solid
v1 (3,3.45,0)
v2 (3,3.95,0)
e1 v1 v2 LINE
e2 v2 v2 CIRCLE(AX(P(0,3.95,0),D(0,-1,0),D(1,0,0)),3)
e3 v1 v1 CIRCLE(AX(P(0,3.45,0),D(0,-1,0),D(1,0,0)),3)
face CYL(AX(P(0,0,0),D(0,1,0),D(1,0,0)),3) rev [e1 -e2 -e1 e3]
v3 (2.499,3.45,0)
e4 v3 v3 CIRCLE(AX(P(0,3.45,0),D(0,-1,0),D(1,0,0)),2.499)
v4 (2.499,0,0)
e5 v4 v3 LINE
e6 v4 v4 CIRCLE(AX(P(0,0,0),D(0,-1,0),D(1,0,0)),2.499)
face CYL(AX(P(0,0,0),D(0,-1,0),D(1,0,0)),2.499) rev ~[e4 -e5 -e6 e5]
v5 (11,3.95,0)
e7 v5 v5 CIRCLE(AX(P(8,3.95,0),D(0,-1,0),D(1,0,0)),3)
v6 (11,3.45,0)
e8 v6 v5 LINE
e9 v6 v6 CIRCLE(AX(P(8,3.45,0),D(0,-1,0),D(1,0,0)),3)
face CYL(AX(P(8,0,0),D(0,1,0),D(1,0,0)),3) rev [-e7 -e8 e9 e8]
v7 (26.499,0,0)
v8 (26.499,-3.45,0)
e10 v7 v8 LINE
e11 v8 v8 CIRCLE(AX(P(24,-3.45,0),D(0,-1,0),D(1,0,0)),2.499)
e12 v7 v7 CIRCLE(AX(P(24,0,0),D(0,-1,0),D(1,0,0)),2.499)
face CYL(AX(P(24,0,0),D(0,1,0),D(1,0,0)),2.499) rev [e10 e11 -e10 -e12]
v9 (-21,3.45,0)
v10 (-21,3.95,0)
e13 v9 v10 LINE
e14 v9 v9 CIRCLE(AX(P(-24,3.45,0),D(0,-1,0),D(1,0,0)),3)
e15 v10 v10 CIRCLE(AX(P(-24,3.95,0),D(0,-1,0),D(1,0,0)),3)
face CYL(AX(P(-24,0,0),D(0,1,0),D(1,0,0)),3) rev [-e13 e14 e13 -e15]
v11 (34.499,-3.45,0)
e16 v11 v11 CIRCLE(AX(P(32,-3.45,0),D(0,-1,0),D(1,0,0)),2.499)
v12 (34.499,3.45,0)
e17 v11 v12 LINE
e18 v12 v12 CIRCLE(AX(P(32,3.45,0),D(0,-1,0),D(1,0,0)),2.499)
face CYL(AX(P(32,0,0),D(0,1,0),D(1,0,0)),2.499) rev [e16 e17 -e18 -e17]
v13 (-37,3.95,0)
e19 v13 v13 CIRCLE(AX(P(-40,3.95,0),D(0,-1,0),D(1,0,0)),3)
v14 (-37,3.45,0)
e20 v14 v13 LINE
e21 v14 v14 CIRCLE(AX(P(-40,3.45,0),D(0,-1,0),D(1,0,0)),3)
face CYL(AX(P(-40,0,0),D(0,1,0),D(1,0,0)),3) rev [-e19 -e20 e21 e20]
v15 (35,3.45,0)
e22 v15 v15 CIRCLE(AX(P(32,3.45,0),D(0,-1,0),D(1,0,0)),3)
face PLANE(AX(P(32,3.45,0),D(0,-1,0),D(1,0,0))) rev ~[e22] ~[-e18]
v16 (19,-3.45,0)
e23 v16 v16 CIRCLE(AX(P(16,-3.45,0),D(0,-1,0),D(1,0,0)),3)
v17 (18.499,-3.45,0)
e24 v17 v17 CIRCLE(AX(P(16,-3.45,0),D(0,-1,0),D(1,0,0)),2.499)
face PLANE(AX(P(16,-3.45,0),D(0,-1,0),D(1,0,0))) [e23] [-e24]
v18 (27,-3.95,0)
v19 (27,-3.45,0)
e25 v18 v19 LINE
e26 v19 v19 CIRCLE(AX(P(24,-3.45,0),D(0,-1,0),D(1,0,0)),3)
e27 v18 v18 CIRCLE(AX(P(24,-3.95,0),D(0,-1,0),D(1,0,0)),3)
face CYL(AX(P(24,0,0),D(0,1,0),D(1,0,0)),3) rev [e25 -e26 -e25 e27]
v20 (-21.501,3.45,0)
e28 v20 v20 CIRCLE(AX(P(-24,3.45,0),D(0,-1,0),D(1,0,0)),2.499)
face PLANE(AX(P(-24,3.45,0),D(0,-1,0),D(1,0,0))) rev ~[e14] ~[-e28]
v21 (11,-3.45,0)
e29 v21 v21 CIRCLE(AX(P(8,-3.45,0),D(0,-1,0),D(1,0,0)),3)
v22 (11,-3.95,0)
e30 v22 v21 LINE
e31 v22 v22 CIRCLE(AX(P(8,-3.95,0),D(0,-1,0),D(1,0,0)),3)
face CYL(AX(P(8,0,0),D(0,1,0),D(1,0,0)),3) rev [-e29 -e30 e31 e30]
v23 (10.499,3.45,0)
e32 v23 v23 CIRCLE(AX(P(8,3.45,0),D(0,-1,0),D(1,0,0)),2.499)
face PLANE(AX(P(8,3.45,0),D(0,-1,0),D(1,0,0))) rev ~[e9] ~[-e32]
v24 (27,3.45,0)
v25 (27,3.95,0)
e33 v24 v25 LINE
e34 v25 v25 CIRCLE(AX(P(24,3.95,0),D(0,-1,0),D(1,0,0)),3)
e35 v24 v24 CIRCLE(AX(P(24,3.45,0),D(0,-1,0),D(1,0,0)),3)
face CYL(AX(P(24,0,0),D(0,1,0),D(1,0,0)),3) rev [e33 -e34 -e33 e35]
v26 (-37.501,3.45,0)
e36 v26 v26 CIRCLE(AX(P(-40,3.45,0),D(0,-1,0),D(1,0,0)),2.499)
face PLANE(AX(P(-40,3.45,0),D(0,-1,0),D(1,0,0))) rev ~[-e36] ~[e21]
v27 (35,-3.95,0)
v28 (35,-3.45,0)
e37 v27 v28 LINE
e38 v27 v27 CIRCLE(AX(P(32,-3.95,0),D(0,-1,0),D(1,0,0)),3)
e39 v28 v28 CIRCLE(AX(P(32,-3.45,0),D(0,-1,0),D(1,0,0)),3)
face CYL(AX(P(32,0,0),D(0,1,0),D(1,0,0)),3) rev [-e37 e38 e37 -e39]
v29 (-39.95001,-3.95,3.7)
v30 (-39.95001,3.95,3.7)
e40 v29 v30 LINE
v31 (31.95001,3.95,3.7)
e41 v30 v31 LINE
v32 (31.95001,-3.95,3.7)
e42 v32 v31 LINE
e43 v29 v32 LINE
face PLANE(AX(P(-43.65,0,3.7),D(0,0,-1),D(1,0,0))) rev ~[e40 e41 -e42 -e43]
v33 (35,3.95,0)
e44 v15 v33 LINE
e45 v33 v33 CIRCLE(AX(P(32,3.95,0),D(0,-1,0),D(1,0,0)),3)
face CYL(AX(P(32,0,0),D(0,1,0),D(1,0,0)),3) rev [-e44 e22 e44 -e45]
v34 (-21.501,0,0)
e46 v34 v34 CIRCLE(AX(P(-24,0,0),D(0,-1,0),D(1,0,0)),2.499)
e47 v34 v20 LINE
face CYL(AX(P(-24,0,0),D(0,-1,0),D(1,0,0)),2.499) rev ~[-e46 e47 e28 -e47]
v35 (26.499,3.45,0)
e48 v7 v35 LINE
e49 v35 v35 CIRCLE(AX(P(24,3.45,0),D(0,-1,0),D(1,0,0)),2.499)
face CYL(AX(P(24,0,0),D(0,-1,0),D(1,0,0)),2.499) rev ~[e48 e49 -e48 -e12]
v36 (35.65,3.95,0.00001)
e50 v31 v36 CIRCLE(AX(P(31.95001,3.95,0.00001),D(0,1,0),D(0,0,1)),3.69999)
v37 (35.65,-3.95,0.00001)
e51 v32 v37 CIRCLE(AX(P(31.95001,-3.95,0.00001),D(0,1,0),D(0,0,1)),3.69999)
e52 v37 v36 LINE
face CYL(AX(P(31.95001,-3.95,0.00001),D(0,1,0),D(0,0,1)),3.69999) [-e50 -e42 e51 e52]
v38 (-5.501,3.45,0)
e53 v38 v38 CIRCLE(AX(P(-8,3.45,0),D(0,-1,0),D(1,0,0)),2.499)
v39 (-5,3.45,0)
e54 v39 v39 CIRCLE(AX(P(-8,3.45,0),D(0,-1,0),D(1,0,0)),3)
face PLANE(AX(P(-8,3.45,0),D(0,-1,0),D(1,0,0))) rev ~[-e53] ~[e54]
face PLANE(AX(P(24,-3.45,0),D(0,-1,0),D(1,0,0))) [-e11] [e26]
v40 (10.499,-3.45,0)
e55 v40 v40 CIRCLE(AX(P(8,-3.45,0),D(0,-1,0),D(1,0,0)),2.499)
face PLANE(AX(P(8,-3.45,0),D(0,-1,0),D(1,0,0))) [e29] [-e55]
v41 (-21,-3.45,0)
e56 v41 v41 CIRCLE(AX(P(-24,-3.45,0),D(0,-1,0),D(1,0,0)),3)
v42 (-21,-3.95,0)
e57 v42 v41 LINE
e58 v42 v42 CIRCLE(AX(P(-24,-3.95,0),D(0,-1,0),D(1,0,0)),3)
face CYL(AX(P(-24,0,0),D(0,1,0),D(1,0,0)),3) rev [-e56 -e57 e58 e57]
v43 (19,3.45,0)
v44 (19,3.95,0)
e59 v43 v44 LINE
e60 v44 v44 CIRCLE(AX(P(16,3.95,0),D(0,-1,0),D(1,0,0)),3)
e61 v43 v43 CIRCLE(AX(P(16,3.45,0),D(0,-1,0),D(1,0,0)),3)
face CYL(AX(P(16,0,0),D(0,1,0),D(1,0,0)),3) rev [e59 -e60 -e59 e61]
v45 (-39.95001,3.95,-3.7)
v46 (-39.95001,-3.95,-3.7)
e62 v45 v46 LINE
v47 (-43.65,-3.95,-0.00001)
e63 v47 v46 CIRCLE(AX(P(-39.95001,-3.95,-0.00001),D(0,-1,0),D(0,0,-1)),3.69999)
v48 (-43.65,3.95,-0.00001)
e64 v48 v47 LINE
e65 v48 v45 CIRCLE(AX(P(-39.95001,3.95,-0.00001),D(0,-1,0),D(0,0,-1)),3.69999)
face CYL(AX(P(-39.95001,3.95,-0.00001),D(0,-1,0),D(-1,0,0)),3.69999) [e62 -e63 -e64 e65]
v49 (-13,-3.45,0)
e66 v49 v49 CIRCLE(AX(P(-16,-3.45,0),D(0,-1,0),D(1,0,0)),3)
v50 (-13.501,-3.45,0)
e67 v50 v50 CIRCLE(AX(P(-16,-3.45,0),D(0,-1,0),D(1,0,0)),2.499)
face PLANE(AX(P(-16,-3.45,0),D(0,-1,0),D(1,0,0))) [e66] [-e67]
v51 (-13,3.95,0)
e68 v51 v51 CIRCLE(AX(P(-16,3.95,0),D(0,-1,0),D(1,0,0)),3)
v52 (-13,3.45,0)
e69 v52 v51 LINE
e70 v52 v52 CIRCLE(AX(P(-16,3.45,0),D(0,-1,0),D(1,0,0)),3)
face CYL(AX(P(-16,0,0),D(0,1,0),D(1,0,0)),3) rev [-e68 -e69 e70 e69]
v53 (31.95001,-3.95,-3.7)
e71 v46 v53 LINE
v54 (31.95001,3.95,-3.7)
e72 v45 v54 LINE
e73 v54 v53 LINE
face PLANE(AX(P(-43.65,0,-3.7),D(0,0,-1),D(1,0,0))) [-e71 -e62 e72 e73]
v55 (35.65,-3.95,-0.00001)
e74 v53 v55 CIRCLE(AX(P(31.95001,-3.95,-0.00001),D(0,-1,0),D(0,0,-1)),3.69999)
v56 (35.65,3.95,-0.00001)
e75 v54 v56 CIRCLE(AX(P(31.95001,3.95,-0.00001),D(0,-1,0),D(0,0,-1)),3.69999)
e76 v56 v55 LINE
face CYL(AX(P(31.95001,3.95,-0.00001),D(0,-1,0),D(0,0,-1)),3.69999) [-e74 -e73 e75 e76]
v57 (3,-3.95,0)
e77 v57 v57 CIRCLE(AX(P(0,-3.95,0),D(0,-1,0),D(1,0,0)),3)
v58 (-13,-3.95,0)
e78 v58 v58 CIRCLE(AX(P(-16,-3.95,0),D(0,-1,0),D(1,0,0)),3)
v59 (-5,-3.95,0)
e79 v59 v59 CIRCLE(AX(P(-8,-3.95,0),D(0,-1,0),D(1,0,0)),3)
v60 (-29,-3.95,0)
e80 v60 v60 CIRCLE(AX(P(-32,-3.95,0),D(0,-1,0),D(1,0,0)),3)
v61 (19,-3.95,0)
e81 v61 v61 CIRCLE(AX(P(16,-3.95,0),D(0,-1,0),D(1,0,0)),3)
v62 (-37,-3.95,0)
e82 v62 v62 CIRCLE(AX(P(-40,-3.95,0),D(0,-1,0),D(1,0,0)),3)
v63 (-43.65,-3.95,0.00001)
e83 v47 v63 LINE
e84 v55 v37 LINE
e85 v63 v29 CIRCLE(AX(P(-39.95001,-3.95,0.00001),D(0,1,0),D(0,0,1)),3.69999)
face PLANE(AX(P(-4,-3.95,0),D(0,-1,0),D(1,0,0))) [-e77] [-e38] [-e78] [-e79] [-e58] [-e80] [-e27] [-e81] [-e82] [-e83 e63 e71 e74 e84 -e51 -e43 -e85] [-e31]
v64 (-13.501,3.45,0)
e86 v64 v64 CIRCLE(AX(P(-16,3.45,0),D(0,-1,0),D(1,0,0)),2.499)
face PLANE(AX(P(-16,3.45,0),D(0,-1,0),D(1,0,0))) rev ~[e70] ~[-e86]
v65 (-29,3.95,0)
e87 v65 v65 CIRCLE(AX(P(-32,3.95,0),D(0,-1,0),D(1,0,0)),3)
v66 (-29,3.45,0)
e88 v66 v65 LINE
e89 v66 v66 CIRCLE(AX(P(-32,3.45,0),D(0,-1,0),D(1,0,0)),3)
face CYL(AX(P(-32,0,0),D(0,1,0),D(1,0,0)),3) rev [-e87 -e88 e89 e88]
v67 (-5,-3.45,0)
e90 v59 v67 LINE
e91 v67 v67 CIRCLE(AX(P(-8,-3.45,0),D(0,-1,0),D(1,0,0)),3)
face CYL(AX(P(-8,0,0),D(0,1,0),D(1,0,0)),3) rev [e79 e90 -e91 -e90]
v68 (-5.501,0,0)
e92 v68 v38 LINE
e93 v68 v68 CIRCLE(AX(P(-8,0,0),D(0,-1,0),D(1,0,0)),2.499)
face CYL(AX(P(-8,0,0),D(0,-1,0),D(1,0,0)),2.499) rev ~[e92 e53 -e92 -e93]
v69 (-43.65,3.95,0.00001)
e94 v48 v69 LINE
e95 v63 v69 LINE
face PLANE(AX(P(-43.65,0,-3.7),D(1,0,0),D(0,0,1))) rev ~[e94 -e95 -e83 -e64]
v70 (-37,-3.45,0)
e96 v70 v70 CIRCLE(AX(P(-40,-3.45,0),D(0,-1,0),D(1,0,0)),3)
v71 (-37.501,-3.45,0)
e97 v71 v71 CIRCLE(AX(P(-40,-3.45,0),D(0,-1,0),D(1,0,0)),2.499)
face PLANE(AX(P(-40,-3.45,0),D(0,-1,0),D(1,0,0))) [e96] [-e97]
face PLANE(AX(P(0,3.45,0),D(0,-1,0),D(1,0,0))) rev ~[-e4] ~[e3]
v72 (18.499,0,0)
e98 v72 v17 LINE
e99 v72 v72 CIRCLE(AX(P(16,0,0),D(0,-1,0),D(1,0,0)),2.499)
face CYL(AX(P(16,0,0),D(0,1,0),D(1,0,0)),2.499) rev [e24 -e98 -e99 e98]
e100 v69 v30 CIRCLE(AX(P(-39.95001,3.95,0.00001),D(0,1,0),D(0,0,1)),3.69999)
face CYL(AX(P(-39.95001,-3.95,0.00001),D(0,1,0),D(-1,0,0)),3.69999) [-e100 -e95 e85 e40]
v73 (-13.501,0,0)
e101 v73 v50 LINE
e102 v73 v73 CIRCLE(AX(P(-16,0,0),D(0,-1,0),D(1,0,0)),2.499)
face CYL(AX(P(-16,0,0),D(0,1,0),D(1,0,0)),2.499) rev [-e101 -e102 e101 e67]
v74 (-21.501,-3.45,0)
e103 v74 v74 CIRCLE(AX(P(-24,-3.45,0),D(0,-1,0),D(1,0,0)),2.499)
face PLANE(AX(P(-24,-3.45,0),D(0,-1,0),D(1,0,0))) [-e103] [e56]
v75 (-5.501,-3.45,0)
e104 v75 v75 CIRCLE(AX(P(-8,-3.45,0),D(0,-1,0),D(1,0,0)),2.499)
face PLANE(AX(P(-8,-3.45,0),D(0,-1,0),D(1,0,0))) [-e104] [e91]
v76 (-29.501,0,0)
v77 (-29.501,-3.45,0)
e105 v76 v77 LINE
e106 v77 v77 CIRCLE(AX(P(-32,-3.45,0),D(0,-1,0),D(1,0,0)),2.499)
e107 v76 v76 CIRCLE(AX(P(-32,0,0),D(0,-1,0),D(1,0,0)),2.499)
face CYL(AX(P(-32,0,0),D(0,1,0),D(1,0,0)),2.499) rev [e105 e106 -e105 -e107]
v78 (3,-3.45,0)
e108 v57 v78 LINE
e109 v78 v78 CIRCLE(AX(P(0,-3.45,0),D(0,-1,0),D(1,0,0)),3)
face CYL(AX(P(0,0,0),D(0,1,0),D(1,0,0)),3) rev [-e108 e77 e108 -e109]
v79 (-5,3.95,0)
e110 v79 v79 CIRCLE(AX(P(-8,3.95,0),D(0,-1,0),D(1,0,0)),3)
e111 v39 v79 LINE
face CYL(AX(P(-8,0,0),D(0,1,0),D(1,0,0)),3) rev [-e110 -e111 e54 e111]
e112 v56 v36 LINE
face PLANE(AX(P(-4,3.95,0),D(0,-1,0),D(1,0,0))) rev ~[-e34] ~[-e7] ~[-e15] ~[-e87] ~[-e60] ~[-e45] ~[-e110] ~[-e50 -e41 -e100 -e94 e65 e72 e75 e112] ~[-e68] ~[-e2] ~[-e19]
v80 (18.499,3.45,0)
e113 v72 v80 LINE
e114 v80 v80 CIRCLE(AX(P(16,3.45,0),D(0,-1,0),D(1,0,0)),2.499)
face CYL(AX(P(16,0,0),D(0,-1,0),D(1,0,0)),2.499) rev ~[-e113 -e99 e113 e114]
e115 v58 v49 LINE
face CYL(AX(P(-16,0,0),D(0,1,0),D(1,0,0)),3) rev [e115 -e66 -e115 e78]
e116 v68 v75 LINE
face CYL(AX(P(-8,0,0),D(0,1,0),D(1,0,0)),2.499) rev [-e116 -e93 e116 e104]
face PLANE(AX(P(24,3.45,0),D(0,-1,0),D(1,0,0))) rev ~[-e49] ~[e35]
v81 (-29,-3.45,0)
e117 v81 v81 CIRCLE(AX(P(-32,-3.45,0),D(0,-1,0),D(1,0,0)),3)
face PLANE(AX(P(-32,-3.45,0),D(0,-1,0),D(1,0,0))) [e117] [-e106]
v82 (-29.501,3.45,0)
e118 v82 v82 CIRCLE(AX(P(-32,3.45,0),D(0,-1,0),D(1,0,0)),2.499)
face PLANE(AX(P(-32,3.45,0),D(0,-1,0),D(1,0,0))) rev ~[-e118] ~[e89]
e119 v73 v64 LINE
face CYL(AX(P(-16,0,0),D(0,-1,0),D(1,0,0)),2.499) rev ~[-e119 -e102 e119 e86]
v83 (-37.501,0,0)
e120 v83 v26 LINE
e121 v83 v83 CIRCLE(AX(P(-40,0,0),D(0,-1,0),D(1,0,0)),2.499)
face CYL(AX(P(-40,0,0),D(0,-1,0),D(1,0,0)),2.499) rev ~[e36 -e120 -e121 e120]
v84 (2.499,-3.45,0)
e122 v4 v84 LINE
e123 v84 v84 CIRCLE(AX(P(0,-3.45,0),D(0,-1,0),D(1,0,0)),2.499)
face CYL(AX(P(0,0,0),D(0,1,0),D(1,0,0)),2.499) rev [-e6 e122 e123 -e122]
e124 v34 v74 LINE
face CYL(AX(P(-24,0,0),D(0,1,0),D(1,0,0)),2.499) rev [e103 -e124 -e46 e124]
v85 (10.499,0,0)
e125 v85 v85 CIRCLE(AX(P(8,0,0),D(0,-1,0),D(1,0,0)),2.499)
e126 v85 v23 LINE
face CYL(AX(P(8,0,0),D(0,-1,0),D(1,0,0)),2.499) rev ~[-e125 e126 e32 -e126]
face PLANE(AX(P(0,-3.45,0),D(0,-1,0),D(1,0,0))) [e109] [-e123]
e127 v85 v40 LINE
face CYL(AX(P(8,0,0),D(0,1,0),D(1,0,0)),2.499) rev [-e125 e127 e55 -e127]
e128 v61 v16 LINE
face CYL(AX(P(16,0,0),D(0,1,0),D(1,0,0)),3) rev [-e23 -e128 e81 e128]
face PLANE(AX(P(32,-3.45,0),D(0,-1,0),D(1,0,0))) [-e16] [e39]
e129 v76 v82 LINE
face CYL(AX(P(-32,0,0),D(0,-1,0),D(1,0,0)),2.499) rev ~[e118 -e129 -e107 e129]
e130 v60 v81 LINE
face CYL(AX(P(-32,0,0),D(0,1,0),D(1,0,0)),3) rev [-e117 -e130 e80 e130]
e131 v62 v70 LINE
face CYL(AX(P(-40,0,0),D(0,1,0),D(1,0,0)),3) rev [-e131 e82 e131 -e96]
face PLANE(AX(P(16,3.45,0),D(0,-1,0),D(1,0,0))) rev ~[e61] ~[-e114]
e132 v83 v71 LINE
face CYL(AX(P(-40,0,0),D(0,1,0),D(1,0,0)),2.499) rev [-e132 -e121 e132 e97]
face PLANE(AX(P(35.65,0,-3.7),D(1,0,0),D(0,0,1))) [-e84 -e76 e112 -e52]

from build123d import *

# Parameters (mm, degrees)
F0_W     = 79.3
F0_H     = 7.4
F0_R     = 3
F1_DEPTH = 3.95
F0_R_2   = 2.499
F2_DEPTH = 3.45
F3_R     = 3.69999


# Not quite as in the source:
# - a fillet or chamfer is up to 0.001 mm smaller than in the source, because OpenCascade refuses the exact size


with BuildPart() as f1:
    # F0 (on Front) → F1 (new body, symmetric)
    with BuildSketch(Plane.XZ):
        with Locations((-4, 0)):
            Rectangle(F0_W, F0_H)
        with Locations((-40, 0)):
            Circle(F0_R, mode=Mode.SUBTRACT)
        with Locations((-32, 0)):
            Circle(F0_R, mode=Mode.SUBTRACT)
        with Locations((-24, 0)):
            Circle(F0_R, mode=Mode.SUBTRACT)
        with Locations((-16, 0)):
            Circle(F0_R, mode=Mode.SUBTRACT)
        with Locations((-8, 0)):
            Circle(F0_R, mode=Mode.SUBTRACT)
        Circle(F0_R, mode=Mode.SUBTRACT)
        with Locations((8, 0)):
            Circle(F0_R, mode=Mode.SUBTRACT)
        with Locations((16, 0)):
            Circle(F0_R, mode=Mode.SUBTRACT)
        with Locations((24, 0)):
            Circle(F0_R, mode=Mode.SUBTRACT)
        with Locations((32, 0)):
            Circle(F0_R, mode=Mode.SUBTRACT)
    extrude(amount=F1_DEPTH, both=True)

    # F0 (on Front) → F2 (join, symmetric)
    with BuildSketch(Plane.XZ):
        with Locations((-40, 0)):
            Circle(F0_R)
        with Locations((-40, 0)):
            Circle(F0_R_2, mode=Mode.SUBTRACT)
        with Locations((-32, 0)):
            Circle(F0_R)
        with Locations((-32, 0)):
            Circle(F0_R_2, mode=Mode.SUBTRACT)
        with Locations((-24, 0)):
            Circle(F0_R)
        with Locations((-24, 0)):
            Circle(F0_R_2, mode=Mode.SUBTRACT)
        with Locations((-16, 0)):
            Circle(F0_R)
        with Locations((-16, 0)):
            Circle(F0_R_2, mode=Mode.SUBTRACT)
        with Locations((-8, 0)):
            Circle(F0_R)
        with Locations((-8, 0)):
            Circle(F0_R_2, mode=Mode.SUBTRACT)
        Circle(F0_R)
        Circle(F0_R_2, mode=Mode.SUBTRACT)
        with Locations((8, 0)):
            Circle(F0_R)
        with Locations((8, 0)):
            Circle(F0_R_2, mode=Mode.SUBTRACT)
        with Locations((16, 0)):
            Circle(F0_R)
        with Locations((16, 0)):
            Circle(F0_R_2, mode=Mode.SUBTRACT)
        with Locations((24, 0)):
            Circle(F0_R)
        with Locations((24, 0)):
            Circle(F0_R_2, mode=Mode.SUBTRACT)
        with Locations((32, 0)):
            Circle(F0_R)
        with Locations((32, 0)):
            Circle(F0_R_2, mode=Mode.SUBTRACT)
    extrude(amount=F2_DEPTH, both=True)

    # F3 (radius 3.7 in the source; OpenCascade refuses exactly that, so slightly less here)
    f3_edges = [f1.edges().sort_by_distance(p)[0] for p in [
        (-43.65, 0, 3.7),
        (35.65, 0, 3.7),
        (35.65, 0, -3.7),
        (-43.65, 0, -3.7),
    ]]
    fillet(f3_edges, radius=F3_R)


solid = f1.part
